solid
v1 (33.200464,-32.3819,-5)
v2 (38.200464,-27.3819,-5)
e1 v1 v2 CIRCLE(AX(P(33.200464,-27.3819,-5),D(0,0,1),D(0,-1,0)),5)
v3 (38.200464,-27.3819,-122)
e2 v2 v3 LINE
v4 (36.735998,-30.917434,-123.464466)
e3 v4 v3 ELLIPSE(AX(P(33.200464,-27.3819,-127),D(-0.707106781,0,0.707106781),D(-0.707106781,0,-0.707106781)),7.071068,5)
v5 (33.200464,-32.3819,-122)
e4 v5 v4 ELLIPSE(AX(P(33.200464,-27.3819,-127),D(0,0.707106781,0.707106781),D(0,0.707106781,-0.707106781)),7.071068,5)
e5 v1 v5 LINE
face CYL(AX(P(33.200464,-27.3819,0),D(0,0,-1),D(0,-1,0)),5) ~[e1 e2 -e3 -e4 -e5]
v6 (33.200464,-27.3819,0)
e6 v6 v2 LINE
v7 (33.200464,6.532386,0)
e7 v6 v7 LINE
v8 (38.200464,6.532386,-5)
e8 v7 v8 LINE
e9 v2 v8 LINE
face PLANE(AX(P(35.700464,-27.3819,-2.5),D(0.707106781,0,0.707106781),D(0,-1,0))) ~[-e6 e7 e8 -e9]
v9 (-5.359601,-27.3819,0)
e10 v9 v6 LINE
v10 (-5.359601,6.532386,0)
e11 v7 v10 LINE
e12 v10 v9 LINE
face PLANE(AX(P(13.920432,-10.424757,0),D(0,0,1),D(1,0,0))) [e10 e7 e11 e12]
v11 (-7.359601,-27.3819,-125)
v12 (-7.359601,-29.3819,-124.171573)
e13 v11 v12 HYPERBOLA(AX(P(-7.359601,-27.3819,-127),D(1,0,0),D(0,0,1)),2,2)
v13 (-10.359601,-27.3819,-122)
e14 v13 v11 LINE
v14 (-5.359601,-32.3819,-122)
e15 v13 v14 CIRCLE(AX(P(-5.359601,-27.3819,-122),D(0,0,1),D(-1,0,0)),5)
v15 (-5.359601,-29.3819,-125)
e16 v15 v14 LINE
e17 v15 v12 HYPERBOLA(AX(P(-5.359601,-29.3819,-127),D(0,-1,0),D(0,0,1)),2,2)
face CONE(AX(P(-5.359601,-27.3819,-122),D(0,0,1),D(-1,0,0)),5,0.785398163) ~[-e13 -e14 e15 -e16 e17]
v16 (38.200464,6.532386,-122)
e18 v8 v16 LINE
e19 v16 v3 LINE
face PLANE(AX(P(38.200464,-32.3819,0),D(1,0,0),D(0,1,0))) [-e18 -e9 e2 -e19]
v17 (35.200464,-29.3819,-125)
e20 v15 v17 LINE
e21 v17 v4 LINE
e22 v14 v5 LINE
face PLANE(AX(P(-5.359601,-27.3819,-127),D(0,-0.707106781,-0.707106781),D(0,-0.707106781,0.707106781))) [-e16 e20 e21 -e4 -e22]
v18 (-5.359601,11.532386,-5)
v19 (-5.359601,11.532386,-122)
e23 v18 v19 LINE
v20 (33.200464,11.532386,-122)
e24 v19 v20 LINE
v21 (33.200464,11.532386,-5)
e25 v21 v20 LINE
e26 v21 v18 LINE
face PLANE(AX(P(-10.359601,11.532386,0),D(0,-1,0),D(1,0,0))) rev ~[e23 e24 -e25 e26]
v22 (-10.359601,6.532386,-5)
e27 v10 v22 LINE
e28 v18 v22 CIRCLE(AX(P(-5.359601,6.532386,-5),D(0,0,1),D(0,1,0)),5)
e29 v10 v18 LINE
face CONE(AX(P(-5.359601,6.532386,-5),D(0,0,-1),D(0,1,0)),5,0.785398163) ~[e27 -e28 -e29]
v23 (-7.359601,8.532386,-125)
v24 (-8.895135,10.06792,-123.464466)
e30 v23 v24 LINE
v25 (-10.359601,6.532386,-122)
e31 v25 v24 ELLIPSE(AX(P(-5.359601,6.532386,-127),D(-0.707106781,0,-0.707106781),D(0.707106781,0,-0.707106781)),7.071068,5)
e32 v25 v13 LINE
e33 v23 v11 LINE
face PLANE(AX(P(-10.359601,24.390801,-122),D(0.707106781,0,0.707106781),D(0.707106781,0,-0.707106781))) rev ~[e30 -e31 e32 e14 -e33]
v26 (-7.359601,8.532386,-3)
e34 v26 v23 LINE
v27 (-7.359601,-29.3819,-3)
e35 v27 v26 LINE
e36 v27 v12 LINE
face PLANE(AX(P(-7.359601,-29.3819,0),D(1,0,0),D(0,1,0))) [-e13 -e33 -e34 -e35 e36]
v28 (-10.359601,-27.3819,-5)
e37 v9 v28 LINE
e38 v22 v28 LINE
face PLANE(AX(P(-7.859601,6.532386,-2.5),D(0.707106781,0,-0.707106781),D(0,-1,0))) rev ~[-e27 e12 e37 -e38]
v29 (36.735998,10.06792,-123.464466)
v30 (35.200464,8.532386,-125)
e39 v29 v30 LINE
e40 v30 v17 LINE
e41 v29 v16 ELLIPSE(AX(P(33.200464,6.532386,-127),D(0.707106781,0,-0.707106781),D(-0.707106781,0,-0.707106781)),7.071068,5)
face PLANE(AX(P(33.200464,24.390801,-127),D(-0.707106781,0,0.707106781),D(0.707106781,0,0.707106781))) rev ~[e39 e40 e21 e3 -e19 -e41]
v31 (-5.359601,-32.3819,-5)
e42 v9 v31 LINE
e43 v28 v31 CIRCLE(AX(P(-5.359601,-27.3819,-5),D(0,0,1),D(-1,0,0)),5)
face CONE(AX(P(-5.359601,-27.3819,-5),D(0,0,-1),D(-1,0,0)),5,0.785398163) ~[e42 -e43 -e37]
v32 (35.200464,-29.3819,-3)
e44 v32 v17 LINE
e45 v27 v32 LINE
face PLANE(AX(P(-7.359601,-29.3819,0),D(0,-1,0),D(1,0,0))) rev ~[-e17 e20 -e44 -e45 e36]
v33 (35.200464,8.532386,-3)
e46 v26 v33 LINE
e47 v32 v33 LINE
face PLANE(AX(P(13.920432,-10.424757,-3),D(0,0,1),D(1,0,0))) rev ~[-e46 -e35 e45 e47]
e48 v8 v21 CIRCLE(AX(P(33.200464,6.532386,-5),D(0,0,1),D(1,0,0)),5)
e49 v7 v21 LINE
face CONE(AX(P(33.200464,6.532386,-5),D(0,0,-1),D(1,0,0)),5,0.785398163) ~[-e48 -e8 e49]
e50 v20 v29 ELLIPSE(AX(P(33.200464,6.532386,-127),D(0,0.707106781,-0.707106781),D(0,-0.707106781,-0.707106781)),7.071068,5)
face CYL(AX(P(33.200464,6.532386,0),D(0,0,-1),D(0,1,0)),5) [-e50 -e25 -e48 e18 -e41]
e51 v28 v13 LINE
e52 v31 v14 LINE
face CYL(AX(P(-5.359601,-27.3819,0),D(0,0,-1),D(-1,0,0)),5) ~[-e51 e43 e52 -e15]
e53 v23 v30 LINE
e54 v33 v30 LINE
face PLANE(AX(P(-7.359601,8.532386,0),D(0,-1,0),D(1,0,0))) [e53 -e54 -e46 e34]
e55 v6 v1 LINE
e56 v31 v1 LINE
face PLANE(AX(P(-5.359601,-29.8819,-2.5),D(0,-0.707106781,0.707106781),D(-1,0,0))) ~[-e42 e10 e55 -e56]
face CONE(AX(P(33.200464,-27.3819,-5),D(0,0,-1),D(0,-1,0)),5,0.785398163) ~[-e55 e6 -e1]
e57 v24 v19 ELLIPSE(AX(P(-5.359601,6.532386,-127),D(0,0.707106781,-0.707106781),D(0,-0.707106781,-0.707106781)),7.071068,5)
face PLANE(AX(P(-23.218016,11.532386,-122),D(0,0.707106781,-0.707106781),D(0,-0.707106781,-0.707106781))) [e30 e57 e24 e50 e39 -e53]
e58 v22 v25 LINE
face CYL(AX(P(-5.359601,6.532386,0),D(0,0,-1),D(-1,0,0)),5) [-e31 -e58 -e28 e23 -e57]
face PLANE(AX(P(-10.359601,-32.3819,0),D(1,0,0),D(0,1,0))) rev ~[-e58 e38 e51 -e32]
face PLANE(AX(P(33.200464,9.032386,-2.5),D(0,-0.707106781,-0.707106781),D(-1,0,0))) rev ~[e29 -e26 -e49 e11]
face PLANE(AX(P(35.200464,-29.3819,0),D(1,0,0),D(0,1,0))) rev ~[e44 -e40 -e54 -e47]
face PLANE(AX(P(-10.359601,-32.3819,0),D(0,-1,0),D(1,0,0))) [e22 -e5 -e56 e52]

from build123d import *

# Parameters (mm, degrees)
F0_W         = 48.5600655451
F0_H         = 43.9142854884
F0_W_2       = 42.5600655451
F0_H_2       = 37.9142854884
F1_DEPTH     = 127
F2_DEPTH     = 3
F3_R         = 5
F4_T1_DEPTH  = 51.7727004283
F4_T3_DEPTH  = 69.6311153681
F4_T5_DEPTH  = 74.2768954248
F4_T7_DEPTH  = 56.418480485
F4_T10_ANGLE = 90
F5_R         = 5
F6_SIZE      = 5


# Not quite as in the source:
# - a fillet or chamfer that OpenCascade refuses, or shapes differently, is made with other operations: its cross-section is extruded or revolved along the edge and cut away or added


with BuildPart() as f1:
    # F0 (on Top) → F1 (new body)
    with BuildSketch(Plane.XY):
        with Locations((13.9204316549, -10.4247569107)):
            Rectangle(F0_W, F0_H)
        with Locations((13.9204316549, -10.4247569107)):
            Rectangle(F0_W_2, F0_H_2, mode=Mode.SUBTRACT)
    extrude(amount=-F1_DEPTH)

    # F0 (on Top) → F2 (join)
    with BuildSketch(Plane.XY):
        with Locations((13.9204316549, -10.4247569107)):
            Rectangle(F0_W_2, F0_H_2)
    extrude(amount=-F2_DEPTH)

    # F3
    f3_edges = [f1.edges().sort_by_distance(p)[0] for p in [
        (-10.359601, -32.3819, -63.5),
    ]]
    fillet(f3_edges, radius=F3_R)

    # F4: chamfer of 5 on 3 edges, made by hand

    # F4_s2 → F4_t1 (cut)
    with BuildSketch(Plane.XZ.offset(-24.3908007734)):
        Polygon((-10.3596011177, -122), (-5.3596011177, -127), (-10.3596011177, -127), align=None)
    extrude(amount=F4_T1_DEPTH, mode=Mode.SUBTRACT)

    # F4_s4 → F4_t3 (cut)
    with BuildSketch(Plane.XZ.offset(-24.3908007734)):
        Polygon((33.2004644275, -127), (38.2004644275, -122), (38.2004644275, -127), align=None)
    extrude(amount=F4_T3_DEPTH, mode=Mode.SUBTRACT)

    # F4_s6 → F4_t5 (cut)
    with BuildSketch(Plane.YZ.offset(-23.2180160575)):
        Polygon((11.5323858336, -122), (6.5323858336, -127), (11.5323858336, -127), align=None)
    extrude(amount=F4_T5_DEPTH, mode=Mode.SUBTRACT)

    # F4_s8 → F4_t7 (cut)
    with BuildSketch(Plane.YZ.offset(-5.3596011177)):
        Polygon((-27.3818996549, -127), (-32.3818996549, -122), (-32.3818996549, -127), align=None)
    extrude(amount=F4_T7_DEPTH, mode=Mode.SUBTRACT)

    # F4_s9 → F4_t10 (revolve, cut)
    with BuildSketch(Plane.XZ.offset(27.3818996549)):
        Polygon((-10.3596011177, -122), (-5.3596011177, -127), (-10.3596011177, -127), align=None)
    revolve(axis=Axis((-5.3596011177, -27.3818996549, -127), (0, 0, 1)), revolution_arc=F4_T10_ANGLE, mode=Mode.SUBTRACT)

    # F5
    f5_edges = [f1.edges().sort_by_distance(p)[0] for p in [
        (-10.359601, 11.532386, -61),
        (38.200464, 11.532386, -61),
        (38.200464, -32.3819, -61),
    ]]
    fillet(f5_edges, radius=F5_R)

    # F6
    f6_edges = [f1.edges().sort_by_distance(p)[0] for p in [
        (13.920432, -32.3819, 0),
    ]]
    chamfer(f6_edges, length=F6_SIZE)


solid = f1.part
